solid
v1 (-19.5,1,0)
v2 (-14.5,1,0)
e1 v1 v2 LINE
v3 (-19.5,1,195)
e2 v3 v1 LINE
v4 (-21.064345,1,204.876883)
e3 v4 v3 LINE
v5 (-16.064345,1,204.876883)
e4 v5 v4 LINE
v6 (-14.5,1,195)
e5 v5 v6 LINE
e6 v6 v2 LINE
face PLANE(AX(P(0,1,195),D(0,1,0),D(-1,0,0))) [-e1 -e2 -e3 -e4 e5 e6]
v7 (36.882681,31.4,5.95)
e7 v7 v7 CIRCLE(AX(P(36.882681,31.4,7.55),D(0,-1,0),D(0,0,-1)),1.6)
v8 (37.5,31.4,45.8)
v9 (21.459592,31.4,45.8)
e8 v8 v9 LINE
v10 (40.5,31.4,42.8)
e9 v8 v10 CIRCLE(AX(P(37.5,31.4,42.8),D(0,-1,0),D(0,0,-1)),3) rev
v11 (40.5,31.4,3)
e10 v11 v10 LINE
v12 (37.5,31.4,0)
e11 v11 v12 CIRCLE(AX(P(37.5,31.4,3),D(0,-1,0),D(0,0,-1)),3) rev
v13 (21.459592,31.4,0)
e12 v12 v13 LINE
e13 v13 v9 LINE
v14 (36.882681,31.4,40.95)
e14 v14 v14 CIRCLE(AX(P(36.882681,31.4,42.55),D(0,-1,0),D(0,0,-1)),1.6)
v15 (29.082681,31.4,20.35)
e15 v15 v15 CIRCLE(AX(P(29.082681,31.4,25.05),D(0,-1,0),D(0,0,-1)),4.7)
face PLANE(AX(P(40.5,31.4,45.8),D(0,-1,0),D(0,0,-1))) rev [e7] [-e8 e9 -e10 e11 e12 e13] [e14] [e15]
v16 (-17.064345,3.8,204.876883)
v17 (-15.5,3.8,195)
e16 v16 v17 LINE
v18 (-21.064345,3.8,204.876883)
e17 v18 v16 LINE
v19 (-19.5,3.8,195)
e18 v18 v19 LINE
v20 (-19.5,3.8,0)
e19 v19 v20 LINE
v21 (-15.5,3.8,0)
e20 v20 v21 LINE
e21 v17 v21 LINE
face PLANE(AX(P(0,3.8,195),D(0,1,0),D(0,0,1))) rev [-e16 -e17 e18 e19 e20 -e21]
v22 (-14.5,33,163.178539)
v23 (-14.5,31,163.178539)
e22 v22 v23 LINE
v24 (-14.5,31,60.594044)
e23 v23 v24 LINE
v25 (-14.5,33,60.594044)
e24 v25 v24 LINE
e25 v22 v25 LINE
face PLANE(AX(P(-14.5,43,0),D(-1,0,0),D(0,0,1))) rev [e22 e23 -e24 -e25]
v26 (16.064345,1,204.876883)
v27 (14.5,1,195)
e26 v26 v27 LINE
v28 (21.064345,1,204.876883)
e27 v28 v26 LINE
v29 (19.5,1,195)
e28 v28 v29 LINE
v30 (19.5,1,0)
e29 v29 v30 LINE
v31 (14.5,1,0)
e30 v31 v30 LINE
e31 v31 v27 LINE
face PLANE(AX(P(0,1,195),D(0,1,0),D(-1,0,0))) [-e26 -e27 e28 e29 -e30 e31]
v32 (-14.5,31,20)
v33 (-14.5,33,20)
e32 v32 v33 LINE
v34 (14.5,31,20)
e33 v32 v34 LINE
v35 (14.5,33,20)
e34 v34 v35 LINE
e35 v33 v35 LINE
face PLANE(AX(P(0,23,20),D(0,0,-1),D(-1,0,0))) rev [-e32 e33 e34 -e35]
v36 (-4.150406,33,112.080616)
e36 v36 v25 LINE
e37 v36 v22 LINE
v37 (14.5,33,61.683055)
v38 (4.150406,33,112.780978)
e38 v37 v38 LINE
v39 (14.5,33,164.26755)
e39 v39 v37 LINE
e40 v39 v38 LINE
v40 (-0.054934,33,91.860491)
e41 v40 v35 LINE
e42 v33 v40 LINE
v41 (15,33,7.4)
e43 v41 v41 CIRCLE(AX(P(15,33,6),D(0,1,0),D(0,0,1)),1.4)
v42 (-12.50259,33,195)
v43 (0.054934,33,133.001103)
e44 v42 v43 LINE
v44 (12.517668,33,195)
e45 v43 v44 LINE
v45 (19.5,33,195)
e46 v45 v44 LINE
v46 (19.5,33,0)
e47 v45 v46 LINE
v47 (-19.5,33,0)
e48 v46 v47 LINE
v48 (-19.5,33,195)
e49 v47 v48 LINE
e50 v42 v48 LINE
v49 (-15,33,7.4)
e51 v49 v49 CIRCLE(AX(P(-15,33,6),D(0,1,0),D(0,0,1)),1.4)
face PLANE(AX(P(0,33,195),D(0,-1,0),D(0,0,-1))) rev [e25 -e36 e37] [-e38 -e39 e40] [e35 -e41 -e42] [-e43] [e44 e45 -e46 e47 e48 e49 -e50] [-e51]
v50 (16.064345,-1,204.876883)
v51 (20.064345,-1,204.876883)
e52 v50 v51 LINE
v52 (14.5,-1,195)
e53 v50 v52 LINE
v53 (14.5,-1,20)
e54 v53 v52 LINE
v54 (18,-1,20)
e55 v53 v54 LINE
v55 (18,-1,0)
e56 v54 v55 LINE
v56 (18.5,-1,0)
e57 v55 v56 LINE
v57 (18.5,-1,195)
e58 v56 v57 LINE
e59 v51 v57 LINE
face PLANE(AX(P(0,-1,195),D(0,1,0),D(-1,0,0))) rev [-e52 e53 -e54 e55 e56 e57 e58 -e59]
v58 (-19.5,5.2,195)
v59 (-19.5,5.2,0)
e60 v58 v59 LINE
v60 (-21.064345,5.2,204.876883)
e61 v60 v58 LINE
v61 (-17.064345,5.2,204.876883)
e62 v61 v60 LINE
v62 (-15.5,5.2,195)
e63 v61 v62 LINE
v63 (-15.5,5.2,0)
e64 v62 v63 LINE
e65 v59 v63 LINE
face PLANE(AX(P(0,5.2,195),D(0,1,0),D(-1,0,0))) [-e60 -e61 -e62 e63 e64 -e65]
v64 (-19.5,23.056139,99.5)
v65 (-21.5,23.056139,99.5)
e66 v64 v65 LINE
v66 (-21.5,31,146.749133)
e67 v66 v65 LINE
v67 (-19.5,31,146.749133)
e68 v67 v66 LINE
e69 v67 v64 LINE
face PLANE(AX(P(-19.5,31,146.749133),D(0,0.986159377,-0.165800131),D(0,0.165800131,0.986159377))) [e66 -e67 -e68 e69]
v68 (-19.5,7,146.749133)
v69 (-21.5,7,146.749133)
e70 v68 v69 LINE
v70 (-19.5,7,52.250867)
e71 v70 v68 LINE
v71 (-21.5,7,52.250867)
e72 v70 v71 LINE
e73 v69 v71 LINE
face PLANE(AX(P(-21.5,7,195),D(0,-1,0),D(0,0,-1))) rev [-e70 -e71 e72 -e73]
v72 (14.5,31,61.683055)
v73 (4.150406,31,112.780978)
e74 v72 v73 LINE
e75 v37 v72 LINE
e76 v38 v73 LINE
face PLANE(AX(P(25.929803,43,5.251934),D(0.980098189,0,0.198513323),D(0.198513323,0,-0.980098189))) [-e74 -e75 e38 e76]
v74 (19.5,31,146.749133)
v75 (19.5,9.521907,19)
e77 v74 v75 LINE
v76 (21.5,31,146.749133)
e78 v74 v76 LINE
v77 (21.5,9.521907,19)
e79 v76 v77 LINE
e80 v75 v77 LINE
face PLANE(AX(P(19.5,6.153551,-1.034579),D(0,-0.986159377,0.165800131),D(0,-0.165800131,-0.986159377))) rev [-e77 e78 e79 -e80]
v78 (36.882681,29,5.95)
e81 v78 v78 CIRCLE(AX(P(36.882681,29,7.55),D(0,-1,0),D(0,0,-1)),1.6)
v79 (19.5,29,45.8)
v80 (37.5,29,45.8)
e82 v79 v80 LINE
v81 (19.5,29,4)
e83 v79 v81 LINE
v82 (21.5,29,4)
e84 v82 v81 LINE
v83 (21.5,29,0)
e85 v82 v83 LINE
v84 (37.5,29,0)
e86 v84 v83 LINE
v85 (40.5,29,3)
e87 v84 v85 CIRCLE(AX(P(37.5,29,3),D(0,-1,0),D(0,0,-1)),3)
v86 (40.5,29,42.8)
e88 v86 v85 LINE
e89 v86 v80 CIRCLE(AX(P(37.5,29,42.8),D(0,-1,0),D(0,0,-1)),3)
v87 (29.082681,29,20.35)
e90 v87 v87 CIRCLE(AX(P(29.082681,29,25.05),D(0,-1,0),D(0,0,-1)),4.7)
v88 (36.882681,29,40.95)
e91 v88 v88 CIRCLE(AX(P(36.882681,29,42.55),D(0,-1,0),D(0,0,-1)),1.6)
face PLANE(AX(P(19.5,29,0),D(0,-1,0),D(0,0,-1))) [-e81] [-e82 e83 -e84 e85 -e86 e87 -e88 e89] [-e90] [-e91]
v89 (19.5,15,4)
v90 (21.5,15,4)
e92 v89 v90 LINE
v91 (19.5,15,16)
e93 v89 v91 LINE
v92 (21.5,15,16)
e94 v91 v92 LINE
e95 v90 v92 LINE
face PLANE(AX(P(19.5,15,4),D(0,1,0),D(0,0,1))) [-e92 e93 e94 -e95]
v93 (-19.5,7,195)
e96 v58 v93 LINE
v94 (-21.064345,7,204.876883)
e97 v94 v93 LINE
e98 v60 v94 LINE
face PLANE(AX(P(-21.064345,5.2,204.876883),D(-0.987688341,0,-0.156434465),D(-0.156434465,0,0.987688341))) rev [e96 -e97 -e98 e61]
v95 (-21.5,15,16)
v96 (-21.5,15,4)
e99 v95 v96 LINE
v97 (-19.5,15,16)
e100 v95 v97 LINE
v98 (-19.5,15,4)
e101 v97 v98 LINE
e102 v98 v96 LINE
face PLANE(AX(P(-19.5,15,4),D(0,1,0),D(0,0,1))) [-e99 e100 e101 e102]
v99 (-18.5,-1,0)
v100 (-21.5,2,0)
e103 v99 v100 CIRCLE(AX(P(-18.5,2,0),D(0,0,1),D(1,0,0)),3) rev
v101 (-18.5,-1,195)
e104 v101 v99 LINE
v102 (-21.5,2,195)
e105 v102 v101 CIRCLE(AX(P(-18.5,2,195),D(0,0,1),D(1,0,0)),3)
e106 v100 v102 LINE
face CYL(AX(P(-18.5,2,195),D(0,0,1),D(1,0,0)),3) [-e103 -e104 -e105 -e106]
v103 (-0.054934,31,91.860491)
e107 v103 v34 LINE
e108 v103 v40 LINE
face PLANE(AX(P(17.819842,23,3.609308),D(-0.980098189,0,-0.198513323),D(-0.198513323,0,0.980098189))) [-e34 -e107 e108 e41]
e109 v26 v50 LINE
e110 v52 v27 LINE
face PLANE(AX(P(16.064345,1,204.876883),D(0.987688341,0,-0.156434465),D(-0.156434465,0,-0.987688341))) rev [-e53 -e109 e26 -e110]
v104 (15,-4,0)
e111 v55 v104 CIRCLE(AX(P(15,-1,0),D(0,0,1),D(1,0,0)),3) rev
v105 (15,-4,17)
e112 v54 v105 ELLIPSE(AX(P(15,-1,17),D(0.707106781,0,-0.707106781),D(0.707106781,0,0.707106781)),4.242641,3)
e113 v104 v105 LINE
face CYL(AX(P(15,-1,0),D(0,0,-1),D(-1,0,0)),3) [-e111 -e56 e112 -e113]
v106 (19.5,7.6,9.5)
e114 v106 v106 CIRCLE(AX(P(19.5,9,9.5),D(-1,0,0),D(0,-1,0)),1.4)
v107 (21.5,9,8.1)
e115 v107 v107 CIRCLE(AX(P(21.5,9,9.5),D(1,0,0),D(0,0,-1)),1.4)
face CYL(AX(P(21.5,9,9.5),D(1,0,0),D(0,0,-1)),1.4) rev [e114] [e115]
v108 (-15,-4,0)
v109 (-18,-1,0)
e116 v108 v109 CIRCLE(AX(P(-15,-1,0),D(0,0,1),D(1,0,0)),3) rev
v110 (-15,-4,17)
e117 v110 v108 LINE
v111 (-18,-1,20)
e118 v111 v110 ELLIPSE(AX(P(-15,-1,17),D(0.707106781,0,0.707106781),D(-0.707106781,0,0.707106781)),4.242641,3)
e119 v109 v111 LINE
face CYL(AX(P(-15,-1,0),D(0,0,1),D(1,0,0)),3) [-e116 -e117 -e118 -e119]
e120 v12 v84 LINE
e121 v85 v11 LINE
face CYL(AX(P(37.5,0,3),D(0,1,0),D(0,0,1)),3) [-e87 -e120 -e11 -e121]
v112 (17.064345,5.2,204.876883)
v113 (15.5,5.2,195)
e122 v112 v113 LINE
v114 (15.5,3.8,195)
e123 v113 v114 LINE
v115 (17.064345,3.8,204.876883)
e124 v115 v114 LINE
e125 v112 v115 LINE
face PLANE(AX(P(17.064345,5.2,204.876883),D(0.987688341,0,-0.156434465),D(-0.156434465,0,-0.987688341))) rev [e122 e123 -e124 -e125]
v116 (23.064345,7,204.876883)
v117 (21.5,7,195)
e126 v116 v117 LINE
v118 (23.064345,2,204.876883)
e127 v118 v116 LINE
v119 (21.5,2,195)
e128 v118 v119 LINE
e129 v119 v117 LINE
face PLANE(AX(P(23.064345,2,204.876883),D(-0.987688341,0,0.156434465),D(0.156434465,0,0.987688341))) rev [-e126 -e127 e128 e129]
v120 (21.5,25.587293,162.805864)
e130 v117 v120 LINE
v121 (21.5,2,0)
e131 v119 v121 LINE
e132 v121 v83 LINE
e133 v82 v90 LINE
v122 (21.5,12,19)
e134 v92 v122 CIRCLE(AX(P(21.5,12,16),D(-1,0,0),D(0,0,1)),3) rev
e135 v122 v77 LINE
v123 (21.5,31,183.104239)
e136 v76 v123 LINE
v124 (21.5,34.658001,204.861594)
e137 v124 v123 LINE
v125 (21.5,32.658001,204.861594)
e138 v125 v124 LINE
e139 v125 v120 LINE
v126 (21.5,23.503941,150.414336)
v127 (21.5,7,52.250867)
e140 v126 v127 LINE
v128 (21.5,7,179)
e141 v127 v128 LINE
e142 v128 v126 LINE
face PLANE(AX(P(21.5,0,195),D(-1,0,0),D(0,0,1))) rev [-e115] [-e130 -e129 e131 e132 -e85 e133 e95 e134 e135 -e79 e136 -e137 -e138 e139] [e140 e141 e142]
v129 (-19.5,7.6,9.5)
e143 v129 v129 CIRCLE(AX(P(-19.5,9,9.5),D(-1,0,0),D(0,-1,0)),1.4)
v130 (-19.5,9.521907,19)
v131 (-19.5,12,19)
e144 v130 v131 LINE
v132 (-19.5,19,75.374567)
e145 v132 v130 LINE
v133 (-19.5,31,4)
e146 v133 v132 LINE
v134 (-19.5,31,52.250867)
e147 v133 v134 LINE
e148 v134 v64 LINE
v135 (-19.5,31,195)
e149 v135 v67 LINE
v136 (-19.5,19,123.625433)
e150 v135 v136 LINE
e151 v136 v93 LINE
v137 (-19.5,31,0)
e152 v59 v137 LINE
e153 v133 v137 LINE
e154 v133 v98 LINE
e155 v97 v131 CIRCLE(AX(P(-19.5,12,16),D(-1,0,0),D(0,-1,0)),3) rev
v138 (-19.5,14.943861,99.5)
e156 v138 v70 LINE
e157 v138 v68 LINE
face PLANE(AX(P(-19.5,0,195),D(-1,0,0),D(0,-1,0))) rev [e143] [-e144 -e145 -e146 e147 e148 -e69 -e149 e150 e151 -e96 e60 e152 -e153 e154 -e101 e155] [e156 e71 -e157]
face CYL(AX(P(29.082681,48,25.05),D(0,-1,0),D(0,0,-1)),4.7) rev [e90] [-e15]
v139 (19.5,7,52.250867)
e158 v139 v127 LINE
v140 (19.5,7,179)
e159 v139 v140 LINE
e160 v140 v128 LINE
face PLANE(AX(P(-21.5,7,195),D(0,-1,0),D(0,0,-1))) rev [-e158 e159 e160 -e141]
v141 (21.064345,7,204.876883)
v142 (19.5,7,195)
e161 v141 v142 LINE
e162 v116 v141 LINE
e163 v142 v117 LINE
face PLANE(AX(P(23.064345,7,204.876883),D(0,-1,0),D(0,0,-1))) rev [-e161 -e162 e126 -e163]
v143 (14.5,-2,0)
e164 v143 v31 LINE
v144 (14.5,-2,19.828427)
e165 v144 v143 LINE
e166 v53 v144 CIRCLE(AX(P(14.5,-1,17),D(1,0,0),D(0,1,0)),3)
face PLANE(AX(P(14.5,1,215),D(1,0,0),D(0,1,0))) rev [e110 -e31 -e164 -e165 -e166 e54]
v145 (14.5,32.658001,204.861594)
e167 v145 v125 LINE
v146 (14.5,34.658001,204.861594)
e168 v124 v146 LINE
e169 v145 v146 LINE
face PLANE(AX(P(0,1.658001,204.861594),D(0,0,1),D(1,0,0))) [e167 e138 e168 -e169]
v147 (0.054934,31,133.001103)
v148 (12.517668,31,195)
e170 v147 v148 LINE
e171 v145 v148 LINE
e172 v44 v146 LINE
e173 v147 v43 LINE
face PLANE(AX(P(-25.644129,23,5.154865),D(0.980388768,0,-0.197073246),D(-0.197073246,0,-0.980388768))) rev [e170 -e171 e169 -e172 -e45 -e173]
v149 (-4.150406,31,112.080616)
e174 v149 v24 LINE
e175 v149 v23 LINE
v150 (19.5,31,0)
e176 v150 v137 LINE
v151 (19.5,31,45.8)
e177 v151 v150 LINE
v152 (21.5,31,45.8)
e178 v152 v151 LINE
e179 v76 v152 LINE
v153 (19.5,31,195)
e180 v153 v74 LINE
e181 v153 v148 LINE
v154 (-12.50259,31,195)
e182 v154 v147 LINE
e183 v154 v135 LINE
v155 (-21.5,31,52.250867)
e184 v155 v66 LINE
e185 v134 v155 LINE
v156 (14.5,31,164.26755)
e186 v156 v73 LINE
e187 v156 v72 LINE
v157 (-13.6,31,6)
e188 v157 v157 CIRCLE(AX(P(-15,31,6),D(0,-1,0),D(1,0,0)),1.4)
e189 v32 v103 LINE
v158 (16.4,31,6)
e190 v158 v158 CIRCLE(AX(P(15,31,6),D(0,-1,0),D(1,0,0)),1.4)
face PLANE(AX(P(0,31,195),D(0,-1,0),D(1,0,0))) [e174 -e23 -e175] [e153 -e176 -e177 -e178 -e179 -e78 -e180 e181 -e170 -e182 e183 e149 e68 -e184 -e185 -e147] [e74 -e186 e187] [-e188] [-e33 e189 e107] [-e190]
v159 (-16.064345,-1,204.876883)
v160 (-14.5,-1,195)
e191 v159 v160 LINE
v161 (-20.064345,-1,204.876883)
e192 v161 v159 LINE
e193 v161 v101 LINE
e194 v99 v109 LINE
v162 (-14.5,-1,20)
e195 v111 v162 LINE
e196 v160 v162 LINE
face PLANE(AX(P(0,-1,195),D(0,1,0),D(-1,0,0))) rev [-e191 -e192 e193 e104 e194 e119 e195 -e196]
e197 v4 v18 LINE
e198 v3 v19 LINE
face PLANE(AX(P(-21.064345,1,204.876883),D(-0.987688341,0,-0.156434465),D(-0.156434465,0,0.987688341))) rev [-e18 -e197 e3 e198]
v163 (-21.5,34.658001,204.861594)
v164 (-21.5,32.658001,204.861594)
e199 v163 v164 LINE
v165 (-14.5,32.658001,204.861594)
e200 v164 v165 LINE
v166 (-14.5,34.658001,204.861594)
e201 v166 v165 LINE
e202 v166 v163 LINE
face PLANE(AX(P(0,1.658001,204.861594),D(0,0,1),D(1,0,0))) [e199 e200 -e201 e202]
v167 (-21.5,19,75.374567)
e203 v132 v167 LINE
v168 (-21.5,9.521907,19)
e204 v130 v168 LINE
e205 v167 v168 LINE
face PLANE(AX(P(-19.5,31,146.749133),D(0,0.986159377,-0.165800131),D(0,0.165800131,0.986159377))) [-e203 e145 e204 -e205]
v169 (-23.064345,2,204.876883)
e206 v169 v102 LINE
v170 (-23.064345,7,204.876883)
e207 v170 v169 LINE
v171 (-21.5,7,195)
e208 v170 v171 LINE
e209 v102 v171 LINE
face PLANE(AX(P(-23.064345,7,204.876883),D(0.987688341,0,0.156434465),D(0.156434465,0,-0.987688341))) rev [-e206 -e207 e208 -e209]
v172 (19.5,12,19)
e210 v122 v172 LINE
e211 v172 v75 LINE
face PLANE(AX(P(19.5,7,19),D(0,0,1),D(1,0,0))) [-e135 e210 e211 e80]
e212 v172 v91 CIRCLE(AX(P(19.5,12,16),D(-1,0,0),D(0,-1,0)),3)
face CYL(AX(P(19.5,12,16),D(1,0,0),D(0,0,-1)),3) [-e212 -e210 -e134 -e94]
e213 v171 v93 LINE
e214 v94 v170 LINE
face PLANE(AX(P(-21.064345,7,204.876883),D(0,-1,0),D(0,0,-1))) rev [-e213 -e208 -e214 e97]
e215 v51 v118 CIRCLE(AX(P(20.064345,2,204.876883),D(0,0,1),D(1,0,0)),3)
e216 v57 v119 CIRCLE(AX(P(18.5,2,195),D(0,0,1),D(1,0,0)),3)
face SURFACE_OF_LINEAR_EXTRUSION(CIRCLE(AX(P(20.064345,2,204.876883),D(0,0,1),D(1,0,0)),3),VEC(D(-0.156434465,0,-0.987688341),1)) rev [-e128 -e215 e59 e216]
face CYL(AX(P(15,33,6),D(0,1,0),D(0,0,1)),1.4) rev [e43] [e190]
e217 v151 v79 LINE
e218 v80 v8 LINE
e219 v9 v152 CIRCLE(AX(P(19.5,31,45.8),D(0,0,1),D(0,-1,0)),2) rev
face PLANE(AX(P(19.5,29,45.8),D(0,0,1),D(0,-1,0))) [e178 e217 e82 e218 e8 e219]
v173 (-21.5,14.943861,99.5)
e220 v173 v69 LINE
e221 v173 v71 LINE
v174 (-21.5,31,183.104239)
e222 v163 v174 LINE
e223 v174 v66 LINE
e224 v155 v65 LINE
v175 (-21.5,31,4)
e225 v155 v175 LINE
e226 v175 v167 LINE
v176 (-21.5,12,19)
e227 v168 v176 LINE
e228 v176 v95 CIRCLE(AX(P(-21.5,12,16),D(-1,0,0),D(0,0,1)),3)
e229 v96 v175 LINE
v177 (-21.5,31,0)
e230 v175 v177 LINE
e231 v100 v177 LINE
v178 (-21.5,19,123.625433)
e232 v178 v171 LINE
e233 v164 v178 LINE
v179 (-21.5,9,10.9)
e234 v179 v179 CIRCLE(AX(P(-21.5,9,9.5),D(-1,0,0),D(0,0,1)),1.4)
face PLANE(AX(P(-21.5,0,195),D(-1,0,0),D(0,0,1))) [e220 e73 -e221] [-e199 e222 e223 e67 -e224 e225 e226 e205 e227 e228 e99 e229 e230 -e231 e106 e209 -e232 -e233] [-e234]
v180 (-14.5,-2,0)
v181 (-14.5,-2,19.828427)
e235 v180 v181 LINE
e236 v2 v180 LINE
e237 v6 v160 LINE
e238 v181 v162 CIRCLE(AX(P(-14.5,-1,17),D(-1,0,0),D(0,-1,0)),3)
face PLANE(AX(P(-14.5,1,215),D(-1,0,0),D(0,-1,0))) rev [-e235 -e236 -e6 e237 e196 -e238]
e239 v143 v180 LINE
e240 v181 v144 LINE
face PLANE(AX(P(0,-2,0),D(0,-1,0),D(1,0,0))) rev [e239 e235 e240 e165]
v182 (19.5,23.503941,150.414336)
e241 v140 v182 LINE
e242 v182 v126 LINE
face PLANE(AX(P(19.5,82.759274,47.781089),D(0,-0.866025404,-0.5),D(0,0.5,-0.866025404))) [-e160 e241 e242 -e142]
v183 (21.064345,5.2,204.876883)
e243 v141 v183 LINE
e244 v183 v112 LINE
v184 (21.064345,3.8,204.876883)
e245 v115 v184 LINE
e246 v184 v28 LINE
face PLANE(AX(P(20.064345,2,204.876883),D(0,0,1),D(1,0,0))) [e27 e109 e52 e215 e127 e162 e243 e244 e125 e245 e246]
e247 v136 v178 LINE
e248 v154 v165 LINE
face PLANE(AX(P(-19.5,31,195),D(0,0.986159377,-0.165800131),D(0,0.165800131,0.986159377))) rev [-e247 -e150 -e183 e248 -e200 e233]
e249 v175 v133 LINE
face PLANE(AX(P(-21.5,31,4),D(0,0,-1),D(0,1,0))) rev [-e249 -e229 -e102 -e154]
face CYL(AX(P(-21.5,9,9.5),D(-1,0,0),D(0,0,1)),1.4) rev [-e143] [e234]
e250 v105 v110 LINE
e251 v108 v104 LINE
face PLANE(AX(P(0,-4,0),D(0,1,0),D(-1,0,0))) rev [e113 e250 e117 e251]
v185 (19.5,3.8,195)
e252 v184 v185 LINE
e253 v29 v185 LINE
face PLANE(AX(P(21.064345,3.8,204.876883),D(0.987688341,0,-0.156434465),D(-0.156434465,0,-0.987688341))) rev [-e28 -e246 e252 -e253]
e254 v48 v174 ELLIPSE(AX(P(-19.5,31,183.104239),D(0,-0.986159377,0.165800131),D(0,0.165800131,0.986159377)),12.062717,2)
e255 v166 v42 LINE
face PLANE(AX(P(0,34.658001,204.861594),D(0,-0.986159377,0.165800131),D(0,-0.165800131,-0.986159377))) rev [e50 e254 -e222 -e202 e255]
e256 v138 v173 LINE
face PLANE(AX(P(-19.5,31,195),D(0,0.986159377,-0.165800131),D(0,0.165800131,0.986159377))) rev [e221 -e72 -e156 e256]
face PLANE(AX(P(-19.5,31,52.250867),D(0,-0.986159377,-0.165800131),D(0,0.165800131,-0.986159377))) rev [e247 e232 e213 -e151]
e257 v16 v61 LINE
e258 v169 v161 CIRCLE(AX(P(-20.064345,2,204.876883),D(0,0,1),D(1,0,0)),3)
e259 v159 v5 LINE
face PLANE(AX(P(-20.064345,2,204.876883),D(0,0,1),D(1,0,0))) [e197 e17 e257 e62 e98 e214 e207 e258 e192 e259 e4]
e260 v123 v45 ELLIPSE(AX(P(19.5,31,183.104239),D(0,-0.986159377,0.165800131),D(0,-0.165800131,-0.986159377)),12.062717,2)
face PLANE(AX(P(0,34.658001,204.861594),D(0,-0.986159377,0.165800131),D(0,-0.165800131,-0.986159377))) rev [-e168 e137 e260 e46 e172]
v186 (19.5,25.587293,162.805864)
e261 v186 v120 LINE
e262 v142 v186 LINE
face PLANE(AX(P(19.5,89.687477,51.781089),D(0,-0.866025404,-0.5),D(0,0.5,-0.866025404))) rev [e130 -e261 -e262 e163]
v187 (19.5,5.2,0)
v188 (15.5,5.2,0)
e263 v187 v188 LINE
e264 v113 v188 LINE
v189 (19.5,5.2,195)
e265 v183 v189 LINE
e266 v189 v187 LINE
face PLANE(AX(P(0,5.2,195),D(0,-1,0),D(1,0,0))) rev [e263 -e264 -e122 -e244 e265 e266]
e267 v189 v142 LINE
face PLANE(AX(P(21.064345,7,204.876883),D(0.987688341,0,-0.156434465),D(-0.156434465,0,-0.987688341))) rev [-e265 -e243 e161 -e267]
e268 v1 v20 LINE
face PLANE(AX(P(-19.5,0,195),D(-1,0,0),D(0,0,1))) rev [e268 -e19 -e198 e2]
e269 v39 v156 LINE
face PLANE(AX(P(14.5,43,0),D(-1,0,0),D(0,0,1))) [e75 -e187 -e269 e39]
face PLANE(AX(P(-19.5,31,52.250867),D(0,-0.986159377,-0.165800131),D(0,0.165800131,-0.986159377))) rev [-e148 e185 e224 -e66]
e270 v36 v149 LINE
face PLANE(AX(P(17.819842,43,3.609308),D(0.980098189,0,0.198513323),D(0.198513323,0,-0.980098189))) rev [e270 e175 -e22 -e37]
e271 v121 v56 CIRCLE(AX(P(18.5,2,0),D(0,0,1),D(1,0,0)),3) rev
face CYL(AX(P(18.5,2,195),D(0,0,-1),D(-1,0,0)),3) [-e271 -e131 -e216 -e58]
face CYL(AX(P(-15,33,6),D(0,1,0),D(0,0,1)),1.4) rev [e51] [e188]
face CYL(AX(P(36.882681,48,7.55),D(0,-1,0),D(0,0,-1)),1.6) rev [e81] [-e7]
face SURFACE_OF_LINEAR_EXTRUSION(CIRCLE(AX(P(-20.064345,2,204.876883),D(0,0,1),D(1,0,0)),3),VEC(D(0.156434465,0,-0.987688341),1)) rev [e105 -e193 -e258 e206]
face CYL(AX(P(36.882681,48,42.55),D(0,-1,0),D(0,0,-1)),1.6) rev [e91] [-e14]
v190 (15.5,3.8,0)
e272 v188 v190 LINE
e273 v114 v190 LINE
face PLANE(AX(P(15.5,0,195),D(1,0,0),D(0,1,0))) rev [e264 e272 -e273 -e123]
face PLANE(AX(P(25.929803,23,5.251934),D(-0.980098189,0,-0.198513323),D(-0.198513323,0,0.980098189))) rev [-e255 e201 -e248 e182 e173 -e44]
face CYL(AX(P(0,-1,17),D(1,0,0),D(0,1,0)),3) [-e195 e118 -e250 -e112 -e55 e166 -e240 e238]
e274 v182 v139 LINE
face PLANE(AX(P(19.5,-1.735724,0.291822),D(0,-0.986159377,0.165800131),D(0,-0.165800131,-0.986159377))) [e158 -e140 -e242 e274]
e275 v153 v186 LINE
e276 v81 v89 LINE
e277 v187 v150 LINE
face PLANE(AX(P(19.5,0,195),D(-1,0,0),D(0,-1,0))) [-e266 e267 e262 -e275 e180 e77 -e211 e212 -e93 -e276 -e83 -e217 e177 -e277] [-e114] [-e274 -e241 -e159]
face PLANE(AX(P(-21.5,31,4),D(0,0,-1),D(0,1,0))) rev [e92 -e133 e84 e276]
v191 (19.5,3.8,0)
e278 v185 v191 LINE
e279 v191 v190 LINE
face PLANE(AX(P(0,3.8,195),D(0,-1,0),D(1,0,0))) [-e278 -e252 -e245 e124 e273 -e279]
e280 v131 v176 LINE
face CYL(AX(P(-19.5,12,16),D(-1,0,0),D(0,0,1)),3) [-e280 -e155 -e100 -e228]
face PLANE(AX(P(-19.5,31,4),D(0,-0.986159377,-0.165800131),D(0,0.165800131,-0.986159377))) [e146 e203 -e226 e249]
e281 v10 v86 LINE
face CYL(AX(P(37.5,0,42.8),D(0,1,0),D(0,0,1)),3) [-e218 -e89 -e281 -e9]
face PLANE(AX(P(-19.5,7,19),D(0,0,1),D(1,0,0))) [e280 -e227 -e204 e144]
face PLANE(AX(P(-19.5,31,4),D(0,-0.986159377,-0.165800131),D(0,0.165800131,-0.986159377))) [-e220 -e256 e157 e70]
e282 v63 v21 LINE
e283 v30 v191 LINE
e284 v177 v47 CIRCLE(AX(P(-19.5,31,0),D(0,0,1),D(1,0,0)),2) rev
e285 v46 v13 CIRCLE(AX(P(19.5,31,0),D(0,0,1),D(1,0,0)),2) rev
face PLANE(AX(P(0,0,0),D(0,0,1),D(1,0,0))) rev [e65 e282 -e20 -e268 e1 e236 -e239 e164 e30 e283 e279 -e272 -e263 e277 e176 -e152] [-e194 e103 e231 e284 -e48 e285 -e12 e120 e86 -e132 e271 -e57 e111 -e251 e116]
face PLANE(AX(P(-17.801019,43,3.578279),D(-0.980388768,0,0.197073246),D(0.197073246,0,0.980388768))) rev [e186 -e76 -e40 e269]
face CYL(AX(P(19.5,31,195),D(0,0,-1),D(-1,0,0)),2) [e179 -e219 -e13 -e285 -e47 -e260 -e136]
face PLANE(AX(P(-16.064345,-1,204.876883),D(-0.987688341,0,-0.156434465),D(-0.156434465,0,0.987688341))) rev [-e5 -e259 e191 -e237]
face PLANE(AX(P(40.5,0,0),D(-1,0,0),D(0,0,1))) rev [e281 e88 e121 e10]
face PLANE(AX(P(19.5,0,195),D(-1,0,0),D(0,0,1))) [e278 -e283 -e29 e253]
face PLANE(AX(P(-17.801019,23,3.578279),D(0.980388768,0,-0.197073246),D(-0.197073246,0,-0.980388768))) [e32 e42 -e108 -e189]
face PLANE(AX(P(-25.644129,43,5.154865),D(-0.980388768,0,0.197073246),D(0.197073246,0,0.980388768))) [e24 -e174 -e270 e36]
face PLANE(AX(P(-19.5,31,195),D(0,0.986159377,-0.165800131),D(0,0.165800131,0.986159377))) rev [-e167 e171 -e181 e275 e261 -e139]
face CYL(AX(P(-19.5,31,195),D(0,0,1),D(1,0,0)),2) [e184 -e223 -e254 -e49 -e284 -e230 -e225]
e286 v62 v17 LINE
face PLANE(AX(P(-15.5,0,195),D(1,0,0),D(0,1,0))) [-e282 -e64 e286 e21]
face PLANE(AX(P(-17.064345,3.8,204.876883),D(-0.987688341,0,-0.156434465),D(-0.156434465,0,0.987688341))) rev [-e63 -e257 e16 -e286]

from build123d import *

# Parameters (mm, degrees)
SKETCH1_W                                 = 4
SKETCH1_H                                 = 1.4
SKETCH1_W_2                               = 39
SKETCH1_H_2                               = 2
SKETCH1_W_3                               = 2
SKETCH1_H_3                               = 27.8
SKETCH1_W_4                               = 19.5
BOSS_EXTRUDE1_DEPTH                       = 195
CUT_EXTRUDE1_DEPTH                        = 203.393181703
CUT_EXTRUDE1_DEPTH_BACK                   = 203.393181703
SKETCH2_W                                 = 191
SKETCH2_H                                 = 24
SKETCH3_W                                 = 29
SKETCH3_H                                 = 223
CUT_EXTRUDE2_DEPTH                        = 2
SKETCH5_W                                 = 45.8
SKETCH5_H                                 = 4
BOSS_EXTRUDE2_DEPTH                       = 2
SKETCH8_W                                 = 15
SKETCH8_H                                 = 8
BOSS_EXTRUDE4_DEPTH                       = 2
SKETCH9_W                                 = 15
SKETCH9_H                                 = 8
BOSS_EXTRUDE5_DEPTH                       = 2
BOSS_EXTRUDE6_DEPTH                       = 2
SKETCH6_W                                 = 45.8
SKETCH6_H                                 = 2.4
BOSS_EXTRUDE9_DEPTH                       = 19
SKETCH14_R                                = 4.7
SKETCH14_R_2                              = 1.6
CUT_EXTRUDE3_DEPTH                        = 19
TAP_DRILL_FOR_M3X0_5_TAP1_D               = 2.8
TAP_DRILL_FOR_M3X0_5_TAP1_DEPTH           = 10
TAP_DRILL_FOR_M3X0_5_TAP1_TIP             = 0.841204867
TAP_DRILL_FOR_M3X0_5_TAP1_ON_FACE_2_D     = 2.8
TAP_DRILL_FOR_M3X0_5_TAP1_ON_FACE_2_DEPTH = 10
TAP_DRILL_FOR_M3X0_5_TAP1_ON_FACE_2_TIP   = 0.841204867
TAP_DRILL_FOR_M3X0_5_TAP2_D               = 2.8
TAP_DRILL_FOR_M3X0_5_TAP2_DEPTH           = 10
TAP_DRILL_FOR_M3X0_5_TAP2_TIP             = 0.841204867
BOSS_EXTRUDE10_DEPTH                      = 2
BOSS_EXTRUDE11_START                      = -21.5
BOSS_EXTRUDE11_DEPTH                      = 43
BOSS_EXTRUDE12_DEPTH                      = 3
BOSS_EXTRUDE12_DEPTH_BACK                 = 1
SKETCH23_W                                = 36
SKETCH23_H                                = 20
FILLET3_R                                 = 3
FILLET4_R                                 = 3
FILLET5_R                                 = 3
FILLET6_R                                 = 3
CHAMFER3_SIZE                             = 8
CHAMFER3_SIZE_2                           = 1.410615846
BOSS_EXTRUDE14_DEPTH                      = 10
BOSS_EXTRUDE15_DEPTH                      = 10
FILLET7_R                                 = 2
CUT_EXTRUDE6_DEPTH                        = 10
CUT_EXTRUDE6_DEPTH_BACK                   = 10
SKETCH28_W                                = 29
SKETCH28_H                                = 20
CUT_EXTRUDE7_DEPTH                        = 2


# Read off the part's stored shape, not the designer's step: Boss-Extrude11
# Some blends are built 0.0001 mm under size
with BuildPart() as part:
    # Sketch1 → Boss-Extrude1 (new body)
    with BuildSketch(Plane.XY):
        Polygon((19.5, 1), (19.5, -1), (21.5, -1), (21.5, 5.2), (19.5, 5.2), (19.5, 3.8), align=None)
        with Locations((17.5, 4.5)):
            Rectangle(SKETCH1_W, SKETCH1_H)
        Rectangle(SKETCH1_W_2, SKETCH1_H_2)
        Polygon((-21.5, -1), (-19.5, -1), (-19.5, 1), (-19.5, 3.8), (-19.5, 5.2), (-21.5, 5.2), align=None)
        with Locations((-17.5, 4.5)):
            Rectangle(SKETCH1_W, SKETCH1_H)
        with Locations((20.5, 19.1)):
            Rectangle(SKETCH1_W_3, SKETCH1_H_3)
        with Locations((9.75, 32)):
            Rectangle(SKETCH1_W_4, SKETCH1_H_2)
        with Locations((-9.75, 32)):
            Rectangle(SKETCH1_W_4, SKETCH1_H_2)
        Polygon((-21.5, 33), (-21.5, 5.2), (-19.5, 5.2), (-19.5, 31), (-19.5, 33), align=None)
    extrude(amount=BOSS_EXTRUDE1_DEPTH)

    # Sketch2 → Cut-Extrude1 (cut, two sides: drawn at the far end of the back side and taken through both)
    with BuildSketch(Plane(origin=(21.5, 0, 0), x_dir=(0, 0, -1), z_dir=(1, 0, 0)).offset(-CUT_EXTRUDE1_DEPTH_BACK)):
        with Locations((-99.5, 19)):
            Rectangle(SKETCH2_W, SKETCH2_H)
    extrude(amount=CUT_EXTRUDE1_DEPTH + CUT_EXTRUDE1_DEPTH_BACK, mode=Mode.SUBTRACT)

    # Sketch3 → Cut-Extrude2 (cut)
    with BuildSketch(Plane(origin=(0, -1, 0), x_dir=(-1, 0, 0), z_dir=(0, -1, 0))):
        with Locations((0, -103.5)):
            Rectangle(SKETCH3_W, SKETCH3_H)
    extrude(amount=-CUT_EXTRUDE2_DEPTH, mode=Mode.SUBTRACT)

    # Sketch5 → Boss-Extrude2 (add)
    with BuildSketch(Plane(origin=(21.5, 0, 0), x_dir=(0, 0, -1), z_dir=(1, 0, 0))):
        with Locations((-22.9, 31)):
            Rectangle(SKETCH5_W, SKETCH5_H)
    extrude(amount=-BOSS_EXTRUDE2_DEPTH)

    # Sketch8 → Boss-Extrude4 (add)
    with BuildSketch(Plane(origin=(21.5, 0, 0), x_dir=(0, 0, -1), z_dir=(1, 0, 0))):
        with Locations((-11.5, 11)):
            Rectangle(SKETCH8_W, SKETCH8_H)
    extrude(amount=-BOSS_EXTRUDE4_DEPTH)

    # Sketch9 → Boss-Extrude5 (add)
    with BuildSketch(Plane.ZY.offset(21.5)):
        with Locations((11.5, 11)):
            Rectangle(SKETCH9_W, SKETCH9_H)
    extrude(amount=-BOSS_EXTRUDE5_DEPTH)

    # Sketch10 → Boss-Extrude6 (add)
    with BuildSketch(Plane.ZY.offset(21.5)):
        Polygon((4, 31), (146.749133454, 7), (195, 7), (52.250866546, 31), align=None)
        Polygon((195, 31), (52.250866546, 7), (4, 7), (146.749133454, 31), align=None)
    extrude(amount=-BOSS_EXTRUDE6_DEPTH)

    # Sketch6 → Boss-Extrude9 (add)
    with BuildSketch(Plane(origin=(21.5, 0, 0), x_dir=(0, 0, -1), z_dir=(1, 0, 0))):
        with Locations((-22.9, 30.2)):
            Rectangle(SKETCH6_W, SKETCH6_H)
    extrude(amount=BOSS_EXTRUDE9_DEPTH)

    # Sketch14 → Cut-Extrude3 (cut)
    with BuildSketch(Plane(origin=(0, 29, 0), x_dir=(-1, 0, 0), z_dir=(0, -1, 0))):
        with Locations(Location((-29.082681436, -25.05, 0), (0, 0, 90))):
            Circle(SKETCH14_R)
        with Locations(Location((-36.882681436, -42.55, 0), (0, 0, 90))):
            Circle(SKETCH14_R_2)
        with Locations(Location((-36.882681436, -7.55, 0), (0, 0, 90))):
            Circle(SKETCH14_R_2)
    extrude(amount=-CUT_EXTRUDE3_DEPTH, mode=Mode.SUBTRACT)

    # Tap Drill for M3x0.5 Tap1
    with Locations(Plane(origin=(-21.5, 9, 9.5), x_dir=(0, 0, -1), z_dir=(-1, 0, 0))):
        with Locations((0, 0)):
            Hole(TAP_DRILL_FOR_M3X0_5_TAP1_D / 2, depth=TAP_DRILL_FOR_M3X0_5_TAP1_DEPTH)
            with Locations((0, 0, -(TAP_DRILL_FOR_M3X0_5_TAP1_DEPTH + TAP_DRILL_FOR_M3X0_5_TAP1_TIP / 2))):  # 118° drill point
                Cone(0, TAP_DRILL_FOR_M3X0_5_TAP1_D / 2, TAP_DRILL_FOR_M3X0_5_TAP1_TIP, mode=Mode.SUBTRACT)

    # Tap Drill for M3x0.5 Tap1 on face 2
    with Locations(Plane(origin=(21.5, 9, 9.5), x_dir=(0, 0, 1), z_dir=(1, 0, 0))):
        with Locations((0, 0)):
            Hole(TAP_DRILL_FOR_M3X0_5_TAP1_ON_FACE_2_D / 2, depth=TAP_DRILL_FOR_M3X0_5_TAP1_ON_FACE_2_DEPTH)
            with Locations((0, 0, -(TAP_DRILL_FOR_M3X0_5_TAP1_ON_FACE_2_DEPTH + TAP_DRILL_FOR_M3X0_5_TAP1_ON_FACE_2_TIP / 2))):  # 118° drill point
                Cone(0, TAP_DRILL_FOR_M3X0_5_TAP1_ON_FACE_2_D / 2, TAP_DRILL_FOR_M3X0_5_TAP1_ON_FACE_2_TIP, mode=Mode.SUBTRACT)

    # Tap Drill for M3x0.5 Tap2
    with Locations(Plane(origin=(15, 33, 6), x_dir=(0, 0, 1), z_dir=(0, 1, 0))):
        with Locations((0, 0), (0, -30)):
            Hole(TAP_DRILL_FOR_M3X0_5_TAP2_D / 2, depth=TAP_DRILL_FOR_M3X0_5_TAP2_DEPTH)
            with Locations((0, 0, -(TAP_DRILL_FOR_M3X0_5_TAP2_DEPTH + TAP_DRILL_FOR_M3X0_5_TAP2_TIP / 2))):  # 118° drill point
                Cone(0, TAP_DRILL_FOR_M3X0_5_TAP2_D / 2, TAP_DRILL_FOR_M3X0_5_TAP2_TIP, mode=Mode.SUBTRACT)

    # Sketch13 → Boss-Extrude10 (add)
    with BuildSketch(Plane(origin=(21.5, 0, 0), x_dir=(0, 0, -1), z_dir=(1, 0, 0))):
        Polygon((-150.414335828, 23.503940905), (-162.805864398, 25.587292856), (-195, 7), (-179, 7), align=None)
        Polygon((-146.749133454, 31), (-195, 31), (-162.805864398, 25.587292856), (-146.805864398, 25.587292856), (-150.414335828, 23.503940905), (-52.250866546, 7), (-19, 7), (-19, 9.521906727), align=None)
        Polygon((-146.805864398, 25.587292856), (-162.805864398, 25.587292856), (-150.414335828, 23.503940905), align=None)
    extrude(amount=-BOSS_EXTRUDE10_DEPTH)

    # Boss-Extrude11 outline → Boss-Extrude11 (add)
    with BuildSketch(Plane.YZ.offset(BOSS_EXTRUDE11_START)):
        Polygon((32.658001311, 204.861593768), (31, 195), (33, 195), (34.658001311, 204.861593768), align=None)
    extrude(amount=BOSS_EXTRUDE11_DEPTH)

    # Sketch23 → Boss-Extrude12 (add, two sides: drawn at the far end of the back side and taken through both)
    with BuildSketch(Plane(origin=(0, -1, 0), x_dir=(-1, 0, 0), z_dir=(0, -1, 0)).offset(-BOSS_EXTRUDE12_DEPTH_BACK)):
        with Locations((0, -10)):
            Rectangle(SKETCH23_W, SKETCH23_H)
    extrude(amount=BOSS_EXTRUDE12_DEPTH + BOSS_EXTRUDE12_DEPTH_BACK)

    # Fillet3
    fillet3_edges = [part.edges().sort_by_distance(p)[0] for p in [
        (18, -4, 10),
        (0, -4, 20),
        (-18, -4, 10),
    ]]
    fillet(fillet3_edges, radius=FILLET3_R - 0.0001)  # a hair under: the kernel refuses the full size

    # Fillet4
    fillet4_edges = [part.edges().sort_by_distance(p)[0] for p in [
        (21.5, -1, 97.5),
        (-21.5, -1, 97.5),
    ]]
    fillet(fillet4_edges, radius=FILLET4_R)

    # Fillet5
    fillet5_edges = [part.edges().sort_by_distance(p)[0] for p in [
        (20.5, 15, 19),
        (-20.5, 15, 19),
    ]]
    fillet(fillet5_edges, radius=FILLET5_R)

    # Fillet6
    fillet6_edges = [part.edges().sort_by_distance(p)[0] for p in [
        (40.5, 30.2, 45.8),
        (40.5, 30.2, 0),
    ]]
    fillet(fillet6_edges, radius=FILLET6_R)

    # Chamfer3
    # the kernel refuses this chamfer: 8, 1.410615846 mm, written as the material it takes off along each edge
    with BuildSketch(Plane(origin=(14.5, 0, 20), x_dir=(0, 0.0066825316561017496, -0.9999776716360547), z_dir=(-1, 0, 0))) as chamfer3_piece_1:
        Polygon((CHAMFER3_SIZE * 0.999977671636, CHAMFER3_SIZE * 0.0066825316561), (-CHAMFER3_SIZE_2 * 0.00668253165453, CHAMFER3_SIZE_2 * 0.999977671401), (0, 0), align=None)
    extrude(amount=29, mode=Mode.SUBTRACT)

    # Sketch24 → Boss-Extrude14 (add, along a direction that is not the sketch's normal)
    with BuildSketch(Plane.XY.offset(195)):
        with BuildLine():
            Line((-21.5, 7), (-21.5, 2))
            ThreePointArc((-21.5, 2), (-20.621320344, -0.121320344), (-18.5, -1))
            Line((-18.5, -1), (-14.5, -1))
            Line((-14.5, -1), (-14.5, 1))
            Line((-14.5, 1), (-19.5, 1))
            Line((-19.5, 1), (-19.5, 3.8))
            Line((-19.5, 3.8), (-15.5, 3.8))
            Line((-15.5, 3.8), (-15.5, 5.2))
            Line((-15.5, 5.2), (-19.5, 5.2))
            Line((-19.5, 5.2), (-19.5, 7))
            Line((-19.5, 7), (-21.5, 7))
        make_face()
    extrude(amount=BOSS_EXTRUDE14_DEPTH, dir=(-0.15643446504023106, 0, 0.9876883405951378))

    # Sketch26 → Boss-Extrude15 (add, along a direction that is not the sketch's normal)
    with BuildSketch(Plane.XY.offset(195)):
        with BuildLine():
            Line((14.5, -1), (18.5, -1))
            ThreePointArc((18.5, -1), (20.621320344, -0.121320344), (21.5, 2))
            Line((21.5, 2), (21.5, 7))
            Line((21.5, 7), (19.5, 7))
            Line((19.5, 7), (19.5, 5.2))
            Line((19.5, 5.2), (15.5, 5.2))
            Line((15.5, 5.2), (15.5, 3.8))
            Line((15.5, 3.8), (19.5, 3.8))
            Line((19.5, 3.8), (19.5, 1))
            Line((19.5, 1), (14.5, 1))
            Line((14.5, 1), (14.5, -1))
        make_face()
    extrude(amount=BOSS_EXTRUDE15_DEPTH, dir=(0.15643446504022418, 0, 0.9876883405951389))

    # Fillet7
    fillet7_edges = [part.edges().sort_by_distance(p)[0] for p in [
        (21.5, 33, 97.5),
        (-21.5, 33, 97.5),
    ]]
    fillet(fillet7_edges, radius=FILLET7_R - 0.0001)  # a hair under: the kernel refuses the full size

    # Sketch27 → Cut-Extrude6 (cut, two sides: drawn at the far end of the back side and taken through both)
    with BuildSketch(Plane(origin=(0, 33, 0), x_dir=(1, 0, 0), z_dir=(0, 1, 0)).offset(-CUT_EXTRUDE6_DEPTH_BACK)):
        Polygon((4.150405868, -112.780977824), (14.5, -164.267549777), (14.5, -61.683054851), align=None)
        Polygon((-14.5, -163.178538917), (-4.150405868, -112.080615944), (-14.5, -60.594043992), align=None)
        Polygon((-12.502590183, -195), (12.517667731, -195), (0.054934327, -133.001103045), align=None)
        Polygon((-8.142372311, -204.861593768), (14.5, -204.861593768), (12.517667731, -195), (-12.502590183, -195), (-14.5, -204.861593768), align=None)
        Polygon((-14.5, -20), (-0.054934327, -91.860490724), (14.5, -20), align=None)
    extrude(amount=CUT_EXTRUDE6_DEPTH + CUT_EXTRUDE6_DEPTH_BACK, mode=Mode.SUBTRACT)

    # Sketch28 → Cut-Extrude7 (cut)
    with BuildSketch(Plane(origin=(0, 0, 0), x_dir=(1, 0, 0), z_dir=(0, 1, 0))):
        with Locations((0, -10)):
            Rectangle(SKETCH28_W, SKETCH28_H)
    extrude(amount=-CUT_EXTRUDE7_DEPTH, mode=Mode.SUBTRACT)


solid = part.part
